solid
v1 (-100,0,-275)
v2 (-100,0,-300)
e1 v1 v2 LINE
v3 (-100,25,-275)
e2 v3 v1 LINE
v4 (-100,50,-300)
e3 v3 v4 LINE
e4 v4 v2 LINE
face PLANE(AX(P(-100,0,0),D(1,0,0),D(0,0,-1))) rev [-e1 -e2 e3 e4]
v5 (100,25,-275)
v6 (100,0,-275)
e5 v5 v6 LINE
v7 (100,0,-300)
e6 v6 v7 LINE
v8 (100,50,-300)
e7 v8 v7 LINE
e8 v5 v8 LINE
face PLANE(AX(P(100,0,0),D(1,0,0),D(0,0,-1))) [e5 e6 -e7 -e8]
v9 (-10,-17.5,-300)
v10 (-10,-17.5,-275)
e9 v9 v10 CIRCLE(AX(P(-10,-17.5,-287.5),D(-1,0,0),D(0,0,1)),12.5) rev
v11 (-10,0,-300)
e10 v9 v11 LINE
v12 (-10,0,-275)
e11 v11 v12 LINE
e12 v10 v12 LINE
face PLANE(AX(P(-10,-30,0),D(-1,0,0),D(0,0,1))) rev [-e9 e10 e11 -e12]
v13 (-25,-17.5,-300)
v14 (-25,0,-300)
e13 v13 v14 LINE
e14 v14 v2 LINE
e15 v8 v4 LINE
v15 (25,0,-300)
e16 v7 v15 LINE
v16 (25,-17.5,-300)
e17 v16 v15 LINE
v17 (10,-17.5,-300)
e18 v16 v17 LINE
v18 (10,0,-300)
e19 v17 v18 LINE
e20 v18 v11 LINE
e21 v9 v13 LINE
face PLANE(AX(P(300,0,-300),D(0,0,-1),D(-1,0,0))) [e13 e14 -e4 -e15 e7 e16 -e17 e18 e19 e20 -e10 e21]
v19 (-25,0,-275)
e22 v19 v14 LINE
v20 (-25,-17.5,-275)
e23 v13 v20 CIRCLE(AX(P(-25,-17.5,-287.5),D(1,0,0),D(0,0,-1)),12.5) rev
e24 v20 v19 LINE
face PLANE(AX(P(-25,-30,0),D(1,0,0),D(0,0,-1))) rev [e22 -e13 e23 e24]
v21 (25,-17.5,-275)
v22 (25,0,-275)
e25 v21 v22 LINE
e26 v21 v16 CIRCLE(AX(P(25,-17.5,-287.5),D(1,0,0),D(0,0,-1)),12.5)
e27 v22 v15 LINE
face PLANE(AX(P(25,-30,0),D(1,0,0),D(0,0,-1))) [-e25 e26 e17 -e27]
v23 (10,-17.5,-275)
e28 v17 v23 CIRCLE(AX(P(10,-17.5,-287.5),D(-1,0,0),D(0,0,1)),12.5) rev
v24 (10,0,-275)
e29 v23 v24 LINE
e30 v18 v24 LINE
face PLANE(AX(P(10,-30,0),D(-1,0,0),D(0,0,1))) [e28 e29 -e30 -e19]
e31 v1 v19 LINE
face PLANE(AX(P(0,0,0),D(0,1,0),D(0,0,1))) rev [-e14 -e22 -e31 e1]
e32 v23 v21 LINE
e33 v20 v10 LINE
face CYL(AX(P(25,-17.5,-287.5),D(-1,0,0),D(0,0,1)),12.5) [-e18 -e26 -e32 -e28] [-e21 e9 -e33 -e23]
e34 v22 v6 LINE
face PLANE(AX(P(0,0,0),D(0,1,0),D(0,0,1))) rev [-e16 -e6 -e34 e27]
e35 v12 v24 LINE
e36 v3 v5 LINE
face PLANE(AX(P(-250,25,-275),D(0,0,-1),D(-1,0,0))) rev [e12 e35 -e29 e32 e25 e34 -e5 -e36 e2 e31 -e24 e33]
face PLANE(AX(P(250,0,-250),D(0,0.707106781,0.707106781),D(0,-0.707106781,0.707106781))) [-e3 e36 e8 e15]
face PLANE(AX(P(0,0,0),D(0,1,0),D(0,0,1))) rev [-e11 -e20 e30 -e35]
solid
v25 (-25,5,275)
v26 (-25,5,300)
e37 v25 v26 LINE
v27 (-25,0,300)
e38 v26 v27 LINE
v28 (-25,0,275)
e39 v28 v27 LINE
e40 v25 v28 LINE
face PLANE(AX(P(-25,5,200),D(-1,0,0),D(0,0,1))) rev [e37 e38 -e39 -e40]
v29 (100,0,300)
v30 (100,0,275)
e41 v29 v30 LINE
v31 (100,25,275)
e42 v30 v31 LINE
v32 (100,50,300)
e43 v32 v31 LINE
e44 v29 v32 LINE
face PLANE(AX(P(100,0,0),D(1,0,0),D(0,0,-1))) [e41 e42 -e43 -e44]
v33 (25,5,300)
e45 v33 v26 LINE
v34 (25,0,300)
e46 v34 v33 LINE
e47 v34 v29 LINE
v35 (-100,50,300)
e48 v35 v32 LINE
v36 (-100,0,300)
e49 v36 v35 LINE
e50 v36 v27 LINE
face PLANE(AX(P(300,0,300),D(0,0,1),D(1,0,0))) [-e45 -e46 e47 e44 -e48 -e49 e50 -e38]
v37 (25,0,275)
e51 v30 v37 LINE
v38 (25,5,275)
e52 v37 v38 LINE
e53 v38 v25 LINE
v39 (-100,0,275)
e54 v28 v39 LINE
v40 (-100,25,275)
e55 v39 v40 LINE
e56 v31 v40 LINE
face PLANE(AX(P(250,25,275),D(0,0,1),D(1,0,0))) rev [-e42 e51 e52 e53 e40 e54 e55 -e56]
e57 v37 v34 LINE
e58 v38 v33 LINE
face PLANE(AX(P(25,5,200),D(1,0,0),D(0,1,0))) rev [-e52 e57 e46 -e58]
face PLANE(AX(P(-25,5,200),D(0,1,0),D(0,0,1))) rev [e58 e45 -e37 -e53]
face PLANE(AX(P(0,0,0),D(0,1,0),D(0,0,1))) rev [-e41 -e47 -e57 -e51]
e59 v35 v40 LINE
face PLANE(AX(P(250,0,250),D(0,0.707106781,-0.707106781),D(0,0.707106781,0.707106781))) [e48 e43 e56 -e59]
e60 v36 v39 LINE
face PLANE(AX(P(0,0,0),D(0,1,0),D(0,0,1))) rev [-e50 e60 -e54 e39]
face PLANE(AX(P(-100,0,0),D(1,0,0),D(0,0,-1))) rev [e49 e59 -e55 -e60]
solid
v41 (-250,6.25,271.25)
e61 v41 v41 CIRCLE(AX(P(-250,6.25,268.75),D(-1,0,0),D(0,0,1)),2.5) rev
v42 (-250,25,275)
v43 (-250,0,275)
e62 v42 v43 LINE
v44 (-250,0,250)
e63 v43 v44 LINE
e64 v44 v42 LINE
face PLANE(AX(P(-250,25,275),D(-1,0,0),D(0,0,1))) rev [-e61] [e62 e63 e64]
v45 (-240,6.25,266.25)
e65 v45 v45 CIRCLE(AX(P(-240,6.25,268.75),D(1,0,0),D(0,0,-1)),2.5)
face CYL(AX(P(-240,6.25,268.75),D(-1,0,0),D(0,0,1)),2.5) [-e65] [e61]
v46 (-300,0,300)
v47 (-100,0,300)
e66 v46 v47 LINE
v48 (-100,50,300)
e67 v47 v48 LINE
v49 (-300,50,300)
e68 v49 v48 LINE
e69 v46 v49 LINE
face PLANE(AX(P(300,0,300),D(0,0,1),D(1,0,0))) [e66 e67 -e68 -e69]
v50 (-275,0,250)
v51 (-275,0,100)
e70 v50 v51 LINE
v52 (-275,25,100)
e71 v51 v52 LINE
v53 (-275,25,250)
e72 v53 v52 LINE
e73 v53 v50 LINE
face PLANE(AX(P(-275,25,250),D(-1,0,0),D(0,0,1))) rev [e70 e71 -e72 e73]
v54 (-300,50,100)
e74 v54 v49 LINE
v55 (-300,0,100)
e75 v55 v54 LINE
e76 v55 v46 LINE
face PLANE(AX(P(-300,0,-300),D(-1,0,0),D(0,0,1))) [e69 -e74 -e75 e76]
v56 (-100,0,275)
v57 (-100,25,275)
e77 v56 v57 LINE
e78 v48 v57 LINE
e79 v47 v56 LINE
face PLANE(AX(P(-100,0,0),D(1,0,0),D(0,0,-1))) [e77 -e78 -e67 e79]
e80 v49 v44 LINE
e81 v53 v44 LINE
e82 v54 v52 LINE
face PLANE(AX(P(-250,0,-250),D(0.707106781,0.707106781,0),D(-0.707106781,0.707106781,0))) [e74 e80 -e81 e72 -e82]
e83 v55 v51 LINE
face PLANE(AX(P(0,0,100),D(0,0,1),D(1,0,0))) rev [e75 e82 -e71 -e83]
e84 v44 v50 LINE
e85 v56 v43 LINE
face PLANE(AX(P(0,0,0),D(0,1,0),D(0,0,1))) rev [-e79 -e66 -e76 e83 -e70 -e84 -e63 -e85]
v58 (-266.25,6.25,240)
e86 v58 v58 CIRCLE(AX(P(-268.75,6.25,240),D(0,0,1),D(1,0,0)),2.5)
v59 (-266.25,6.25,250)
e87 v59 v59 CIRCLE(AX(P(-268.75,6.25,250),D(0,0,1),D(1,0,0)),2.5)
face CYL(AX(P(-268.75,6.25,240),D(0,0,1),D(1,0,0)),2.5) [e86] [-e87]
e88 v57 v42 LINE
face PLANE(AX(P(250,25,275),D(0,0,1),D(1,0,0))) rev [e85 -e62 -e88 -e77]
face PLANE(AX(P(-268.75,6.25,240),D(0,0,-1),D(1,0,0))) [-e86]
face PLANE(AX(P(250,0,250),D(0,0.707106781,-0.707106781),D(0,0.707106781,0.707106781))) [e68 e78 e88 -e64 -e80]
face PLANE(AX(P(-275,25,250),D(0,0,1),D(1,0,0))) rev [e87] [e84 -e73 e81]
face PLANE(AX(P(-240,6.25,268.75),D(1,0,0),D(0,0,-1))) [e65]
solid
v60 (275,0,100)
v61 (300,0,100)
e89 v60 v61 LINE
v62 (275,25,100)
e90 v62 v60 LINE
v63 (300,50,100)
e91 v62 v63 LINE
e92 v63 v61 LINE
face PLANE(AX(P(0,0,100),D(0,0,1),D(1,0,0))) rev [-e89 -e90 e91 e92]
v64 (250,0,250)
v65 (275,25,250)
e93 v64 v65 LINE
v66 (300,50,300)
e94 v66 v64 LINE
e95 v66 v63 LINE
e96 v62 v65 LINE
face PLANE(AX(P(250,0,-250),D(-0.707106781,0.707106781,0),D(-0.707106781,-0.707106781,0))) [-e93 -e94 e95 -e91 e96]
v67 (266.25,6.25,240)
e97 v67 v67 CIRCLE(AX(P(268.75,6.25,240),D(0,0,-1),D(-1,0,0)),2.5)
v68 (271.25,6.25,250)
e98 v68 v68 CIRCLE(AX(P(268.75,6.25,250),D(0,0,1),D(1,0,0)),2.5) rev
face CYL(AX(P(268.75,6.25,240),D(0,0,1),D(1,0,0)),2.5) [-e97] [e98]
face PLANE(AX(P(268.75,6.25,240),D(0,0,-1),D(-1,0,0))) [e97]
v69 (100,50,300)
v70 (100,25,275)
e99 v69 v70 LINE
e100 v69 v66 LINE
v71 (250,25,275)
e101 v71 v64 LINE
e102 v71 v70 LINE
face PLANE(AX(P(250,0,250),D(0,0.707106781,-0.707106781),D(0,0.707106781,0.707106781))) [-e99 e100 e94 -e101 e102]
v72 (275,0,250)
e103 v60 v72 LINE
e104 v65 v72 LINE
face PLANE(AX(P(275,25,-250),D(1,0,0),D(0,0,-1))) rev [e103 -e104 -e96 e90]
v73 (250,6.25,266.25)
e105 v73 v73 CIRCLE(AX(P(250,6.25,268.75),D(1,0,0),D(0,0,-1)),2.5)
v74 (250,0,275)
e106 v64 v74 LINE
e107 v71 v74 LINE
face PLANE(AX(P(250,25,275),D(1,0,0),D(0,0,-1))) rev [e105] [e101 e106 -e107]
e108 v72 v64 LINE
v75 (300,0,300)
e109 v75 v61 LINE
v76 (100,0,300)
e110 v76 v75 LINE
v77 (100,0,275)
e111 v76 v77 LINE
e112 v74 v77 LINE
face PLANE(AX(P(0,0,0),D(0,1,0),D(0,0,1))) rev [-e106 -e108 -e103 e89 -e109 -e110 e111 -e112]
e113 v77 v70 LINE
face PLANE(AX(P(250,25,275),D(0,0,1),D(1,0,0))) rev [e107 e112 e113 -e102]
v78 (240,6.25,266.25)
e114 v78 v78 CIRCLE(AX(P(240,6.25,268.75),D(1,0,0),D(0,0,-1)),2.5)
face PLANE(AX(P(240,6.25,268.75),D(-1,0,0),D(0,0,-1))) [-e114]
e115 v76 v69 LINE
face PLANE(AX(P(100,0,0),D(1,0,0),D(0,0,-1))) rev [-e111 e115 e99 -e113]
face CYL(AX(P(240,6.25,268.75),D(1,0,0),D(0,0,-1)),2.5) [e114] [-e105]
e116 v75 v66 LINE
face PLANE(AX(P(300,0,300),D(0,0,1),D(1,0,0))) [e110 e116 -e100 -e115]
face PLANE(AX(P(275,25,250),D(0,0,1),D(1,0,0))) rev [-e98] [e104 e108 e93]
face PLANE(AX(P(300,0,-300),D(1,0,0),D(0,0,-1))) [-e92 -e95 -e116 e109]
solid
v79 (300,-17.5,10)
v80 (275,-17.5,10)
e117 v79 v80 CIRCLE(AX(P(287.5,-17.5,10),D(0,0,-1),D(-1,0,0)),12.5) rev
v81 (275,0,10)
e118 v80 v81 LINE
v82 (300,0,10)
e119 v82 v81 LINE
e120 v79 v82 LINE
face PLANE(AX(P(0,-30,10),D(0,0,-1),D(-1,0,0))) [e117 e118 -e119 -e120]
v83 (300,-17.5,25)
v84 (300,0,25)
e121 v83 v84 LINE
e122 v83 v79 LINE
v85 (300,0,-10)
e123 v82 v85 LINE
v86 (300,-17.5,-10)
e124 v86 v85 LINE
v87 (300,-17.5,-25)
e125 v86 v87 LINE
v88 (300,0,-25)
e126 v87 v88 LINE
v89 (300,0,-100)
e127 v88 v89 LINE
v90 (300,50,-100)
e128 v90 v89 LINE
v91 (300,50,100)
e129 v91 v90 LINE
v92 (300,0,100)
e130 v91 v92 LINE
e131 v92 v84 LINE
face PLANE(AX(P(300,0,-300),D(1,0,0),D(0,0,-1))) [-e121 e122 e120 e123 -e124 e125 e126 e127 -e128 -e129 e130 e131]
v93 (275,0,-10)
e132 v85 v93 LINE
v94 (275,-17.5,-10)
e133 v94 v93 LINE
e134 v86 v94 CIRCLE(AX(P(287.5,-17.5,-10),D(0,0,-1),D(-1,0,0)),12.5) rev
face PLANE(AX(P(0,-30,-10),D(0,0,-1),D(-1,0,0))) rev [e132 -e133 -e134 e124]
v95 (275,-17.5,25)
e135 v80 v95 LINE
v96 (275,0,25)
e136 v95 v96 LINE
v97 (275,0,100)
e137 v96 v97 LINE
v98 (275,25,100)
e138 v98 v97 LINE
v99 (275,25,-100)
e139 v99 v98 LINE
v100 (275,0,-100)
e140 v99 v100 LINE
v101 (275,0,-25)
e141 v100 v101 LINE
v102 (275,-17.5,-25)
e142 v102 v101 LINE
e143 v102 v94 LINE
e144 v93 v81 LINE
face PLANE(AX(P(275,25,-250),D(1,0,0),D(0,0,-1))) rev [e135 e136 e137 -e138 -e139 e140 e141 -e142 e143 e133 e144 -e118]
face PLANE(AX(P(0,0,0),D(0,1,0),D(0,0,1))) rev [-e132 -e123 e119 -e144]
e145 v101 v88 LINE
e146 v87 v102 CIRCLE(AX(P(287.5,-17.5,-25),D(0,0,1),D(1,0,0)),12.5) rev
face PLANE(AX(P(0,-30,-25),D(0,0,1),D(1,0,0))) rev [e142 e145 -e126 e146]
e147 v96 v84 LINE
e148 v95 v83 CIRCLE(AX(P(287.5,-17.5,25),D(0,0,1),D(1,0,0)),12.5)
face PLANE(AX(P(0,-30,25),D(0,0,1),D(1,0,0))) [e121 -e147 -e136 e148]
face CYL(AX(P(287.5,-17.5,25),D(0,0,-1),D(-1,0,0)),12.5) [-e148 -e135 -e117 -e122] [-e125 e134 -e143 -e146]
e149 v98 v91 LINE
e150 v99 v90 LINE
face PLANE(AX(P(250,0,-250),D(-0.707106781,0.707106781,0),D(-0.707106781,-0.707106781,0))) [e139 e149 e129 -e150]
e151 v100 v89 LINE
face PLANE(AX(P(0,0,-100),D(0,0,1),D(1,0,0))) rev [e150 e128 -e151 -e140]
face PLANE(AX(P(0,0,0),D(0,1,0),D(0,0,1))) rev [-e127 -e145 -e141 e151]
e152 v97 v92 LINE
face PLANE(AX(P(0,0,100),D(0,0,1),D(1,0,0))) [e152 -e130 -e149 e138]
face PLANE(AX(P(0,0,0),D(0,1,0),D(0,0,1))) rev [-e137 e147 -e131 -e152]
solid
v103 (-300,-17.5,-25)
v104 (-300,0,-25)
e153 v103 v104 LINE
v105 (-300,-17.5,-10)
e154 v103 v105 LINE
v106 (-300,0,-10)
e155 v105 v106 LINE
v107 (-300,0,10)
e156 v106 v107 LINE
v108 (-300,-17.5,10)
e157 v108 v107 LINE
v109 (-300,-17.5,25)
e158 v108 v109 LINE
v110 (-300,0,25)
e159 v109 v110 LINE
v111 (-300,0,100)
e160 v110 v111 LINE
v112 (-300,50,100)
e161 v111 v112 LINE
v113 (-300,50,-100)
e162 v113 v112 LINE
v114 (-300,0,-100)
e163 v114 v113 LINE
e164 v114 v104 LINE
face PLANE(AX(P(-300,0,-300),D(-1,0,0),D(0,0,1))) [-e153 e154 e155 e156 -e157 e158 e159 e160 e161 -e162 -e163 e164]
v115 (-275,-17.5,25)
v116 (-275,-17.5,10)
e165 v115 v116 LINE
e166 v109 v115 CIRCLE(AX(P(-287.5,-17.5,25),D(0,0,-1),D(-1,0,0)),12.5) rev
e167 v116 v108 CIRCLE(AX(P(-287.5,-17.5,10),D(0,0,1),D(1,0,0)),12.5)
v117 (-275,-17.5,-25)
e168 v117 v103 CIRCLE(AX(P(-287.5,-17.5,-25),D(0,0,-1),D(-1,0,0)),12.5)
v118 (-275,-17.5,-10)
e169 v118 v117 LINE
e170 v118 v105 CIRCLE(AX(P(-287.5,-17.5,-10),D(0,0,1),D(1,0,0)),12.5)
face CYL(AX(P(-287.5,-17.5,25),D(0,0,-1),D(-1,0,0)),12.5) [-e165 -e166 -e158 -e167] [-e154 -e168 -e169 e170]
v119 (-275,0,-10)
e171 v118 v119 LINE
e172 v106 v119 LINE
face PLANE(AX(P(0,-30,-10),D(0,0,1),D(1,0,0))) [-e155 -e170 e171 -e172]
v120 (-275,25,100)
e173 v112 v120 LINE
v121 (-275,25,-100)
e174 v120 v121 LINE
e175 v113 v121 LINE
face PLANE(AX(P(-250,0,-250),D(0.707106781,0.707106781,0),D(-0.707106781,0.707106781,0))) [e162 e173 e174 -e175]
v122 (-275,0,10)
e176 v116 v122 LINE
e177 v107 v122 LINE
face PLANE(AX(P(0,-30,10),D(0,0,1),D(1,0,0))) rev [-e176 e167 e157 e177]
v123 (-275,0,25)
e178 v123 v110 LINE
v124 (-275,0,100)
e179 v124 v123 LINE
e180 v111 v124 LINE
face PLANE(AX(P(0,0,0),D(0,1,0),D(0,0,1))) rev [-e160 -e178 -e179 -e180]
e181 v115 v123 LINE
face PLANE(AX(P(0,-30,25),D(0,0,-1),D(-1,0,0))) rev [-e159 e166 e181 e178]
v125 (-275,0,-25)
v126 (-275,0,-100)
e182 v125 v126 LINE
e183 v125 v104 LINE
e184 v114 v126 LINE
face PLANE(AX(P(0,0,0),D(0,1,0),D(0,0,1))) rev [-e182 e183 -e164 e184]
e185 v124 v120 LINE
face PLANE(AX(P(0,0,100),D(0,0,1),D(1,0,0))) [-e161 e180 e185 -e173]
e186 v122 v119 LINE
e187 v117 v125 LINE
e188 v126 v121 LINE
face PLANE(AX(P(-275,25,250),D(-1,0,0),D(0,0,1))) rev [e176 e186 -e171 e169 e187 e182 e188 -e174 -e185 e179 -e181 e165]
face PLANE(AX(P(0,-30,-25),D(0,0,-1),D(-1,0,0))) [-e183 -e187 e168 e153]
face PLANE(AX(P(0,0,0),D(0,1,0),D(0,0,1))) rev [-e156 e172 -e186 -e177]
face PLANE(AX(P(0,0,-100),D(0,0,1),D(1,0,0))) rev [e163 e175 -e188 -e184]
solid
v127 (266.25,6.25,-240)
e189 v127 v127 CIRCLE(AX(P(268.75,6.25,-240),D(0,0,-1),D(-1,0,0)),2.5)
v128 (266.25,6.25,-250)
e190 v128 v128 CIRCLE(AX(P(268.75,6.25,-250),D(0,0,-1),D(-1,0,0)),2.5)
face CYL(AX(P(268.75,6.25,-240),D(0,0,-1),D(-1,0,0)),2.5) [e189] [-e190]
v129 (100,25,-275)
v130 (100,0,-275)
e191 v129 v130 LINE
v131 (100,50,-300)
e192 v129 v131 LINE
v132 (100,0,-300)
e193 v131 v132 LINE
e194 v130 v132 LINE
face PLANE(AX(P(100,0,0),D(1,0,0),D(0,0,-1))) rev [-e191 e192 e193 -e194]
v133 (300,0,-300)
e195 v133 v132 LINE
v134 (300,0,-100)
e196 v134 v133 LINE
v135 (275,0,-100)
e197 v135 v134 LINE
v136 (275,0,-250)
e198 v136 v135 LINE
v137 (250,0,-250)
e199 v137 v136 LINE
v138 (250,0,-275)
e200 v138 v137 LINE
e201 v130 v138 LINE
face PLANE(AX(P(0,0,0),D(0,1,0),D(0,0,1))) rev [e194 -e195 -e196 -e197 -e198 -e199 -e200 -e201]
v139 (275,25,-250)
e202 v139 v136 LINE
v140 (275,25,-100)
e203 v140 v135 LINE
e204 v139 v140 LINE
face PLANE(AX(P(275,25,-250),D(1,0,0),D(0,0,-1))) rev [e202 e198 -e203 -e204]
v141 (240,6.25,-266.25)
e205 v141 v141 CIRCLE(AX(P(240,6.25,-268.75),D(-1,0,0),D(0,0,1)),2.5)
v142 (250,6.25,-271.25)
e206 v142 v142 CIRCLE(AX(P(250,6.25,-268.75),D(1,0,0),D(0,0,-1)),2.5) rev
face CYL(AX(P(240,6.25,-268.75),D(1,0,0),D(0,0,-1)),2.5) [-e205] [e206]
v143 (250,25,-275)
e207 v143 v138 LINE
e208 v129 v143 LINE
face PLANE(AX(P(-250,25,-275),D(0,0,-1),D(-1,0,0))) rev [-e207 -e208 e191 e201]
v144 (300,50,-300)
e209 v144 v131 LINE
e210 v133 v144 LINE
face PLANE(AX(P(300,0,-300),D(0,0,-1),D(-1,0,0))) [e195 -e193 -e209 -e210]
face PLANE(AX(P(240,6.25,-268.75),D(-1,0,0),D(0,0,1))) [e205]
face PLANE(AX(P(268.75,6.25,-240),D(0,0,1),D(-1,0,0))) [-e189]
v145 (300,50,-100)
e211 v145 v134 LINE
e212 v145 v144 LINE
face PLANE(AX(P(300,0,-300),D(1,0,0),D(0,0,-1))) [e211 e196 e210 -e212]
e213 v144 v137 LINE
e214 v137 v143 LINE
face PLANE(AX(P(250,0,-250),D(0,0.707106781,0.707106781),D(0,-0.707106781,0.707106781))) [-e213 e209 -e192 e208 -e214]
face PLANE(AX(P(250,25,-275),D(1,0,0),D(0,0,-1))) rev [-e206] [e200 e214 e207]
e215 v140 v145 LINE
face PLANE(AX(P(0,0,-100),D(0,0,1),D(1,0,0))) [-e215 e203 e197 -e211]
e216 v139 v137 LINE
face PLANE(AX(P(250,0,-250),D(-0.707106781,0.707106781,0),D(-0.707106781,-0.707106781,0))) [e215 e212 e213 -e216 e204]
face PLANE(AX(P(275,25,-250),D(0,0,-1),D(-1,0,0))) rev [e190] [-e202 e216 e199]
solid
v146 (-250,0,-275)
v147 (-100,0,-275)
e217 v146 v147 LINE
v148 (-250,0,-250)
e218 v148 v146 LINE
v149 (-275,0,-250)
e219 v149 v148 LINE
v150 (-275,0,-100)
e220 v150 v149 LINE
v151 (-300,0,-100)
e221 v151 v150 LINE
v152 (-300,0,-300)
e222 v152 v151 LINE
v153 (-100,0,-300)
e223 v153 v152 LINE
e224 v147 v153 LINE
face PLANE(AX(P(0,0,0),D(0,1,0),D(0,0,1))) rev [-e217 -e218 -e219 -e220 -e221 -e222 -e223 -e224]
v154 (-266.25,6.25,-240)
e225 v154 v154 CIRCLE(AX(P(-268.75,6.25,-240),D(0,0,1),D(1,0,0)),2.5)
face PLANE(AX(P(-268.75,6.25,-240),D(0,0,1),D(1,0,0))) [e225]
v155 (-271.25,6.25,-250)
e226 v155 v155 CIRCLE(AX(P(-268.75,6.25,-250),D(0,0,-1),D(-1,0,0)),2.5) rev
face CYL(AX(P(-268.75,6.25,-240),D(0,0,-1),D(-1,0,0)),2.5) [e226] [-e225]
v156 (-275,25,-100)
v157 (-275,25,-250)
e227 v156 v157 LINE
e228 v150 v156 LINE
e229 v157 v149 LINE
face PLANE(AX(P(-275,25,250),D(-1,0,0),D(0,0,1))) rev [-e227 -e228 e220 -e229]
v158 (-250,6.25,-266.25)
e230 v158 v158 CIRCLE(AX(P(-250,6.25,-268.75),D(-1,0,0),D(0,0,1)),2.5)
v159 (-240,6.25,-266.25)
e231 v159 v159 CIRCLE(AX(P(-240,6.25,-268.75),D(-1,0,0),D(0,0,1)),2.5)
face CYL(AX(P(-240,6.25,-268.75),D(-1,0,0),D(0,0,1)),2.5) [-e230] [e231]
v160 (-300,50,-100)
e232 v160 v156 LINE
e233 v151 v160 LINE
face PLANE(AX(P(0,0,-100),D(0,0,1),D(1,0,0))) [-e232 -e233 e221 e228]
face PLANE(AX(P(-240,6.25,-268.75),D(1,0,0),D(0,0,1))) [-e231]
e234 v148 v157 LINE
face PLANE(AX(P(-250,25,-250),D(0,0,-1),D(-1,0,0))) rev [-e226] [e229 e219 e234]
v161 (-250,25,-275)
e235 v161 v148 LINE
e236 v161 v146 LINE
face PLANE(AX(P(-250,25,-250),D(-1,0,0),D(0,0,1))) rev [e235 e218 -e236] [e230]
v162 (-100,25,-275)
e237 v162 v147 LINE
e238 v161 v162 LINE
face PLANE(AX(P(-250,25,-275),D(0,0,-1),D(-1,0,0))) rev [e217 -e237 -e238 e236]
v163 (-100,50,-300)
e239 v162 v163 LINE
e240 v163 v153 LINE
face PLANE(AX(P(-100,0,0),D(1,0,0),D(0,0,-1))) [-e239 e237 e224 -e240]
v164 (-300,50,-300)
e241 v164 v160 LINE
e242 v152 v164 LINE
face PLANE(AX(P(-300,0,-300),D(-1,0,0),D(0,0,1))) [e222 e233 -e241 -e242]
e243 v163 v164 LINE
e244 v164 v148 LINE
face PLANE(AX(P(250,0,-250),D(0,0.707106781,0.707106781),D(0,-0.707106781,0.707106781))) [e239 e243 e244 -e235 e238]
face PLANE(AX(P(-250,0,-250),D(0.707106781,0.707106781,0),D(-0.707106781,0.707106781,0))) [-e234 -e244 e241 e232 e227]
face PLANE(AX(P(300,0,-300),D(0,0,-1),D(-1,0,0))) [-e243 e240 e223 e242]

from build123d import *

# Parameters (mm, degrees)
SKETCH1_W                                  = 700
SKETCH1_H                                  = 700
SKETCH1_W_2                                = 500
SKETCH1_H_2                                = 500
BOSS_EXTRUDE2_DEPTH                        = 50
BOSS_EXTRUDE2_DRAFT                        = 45
SKETCH6_W                                  = 700
SKETCH6_H                                  = 700
SKETCH6_W_2                                = 600
SKETCH6_H_2                                = 600
CUT_EXTRUDE1_DEPTH                         = 50
CUT_EXTRUDE2_DEPTH                         = 25
SKETCH8_R                                  = 2.5
BOSS_EXTRUDE3_DEPTH                        = 10
MIRROR1_AT_THE_SECOND_PLANE_COPY_1_SKETC_R = 2.5
MIRROR1_AT_THE_SECOND_PLANE_COPY_1_DEPTH   = 10
MIRROR2_COPY_1_SKETCH_R                    = 2.5
MIRROR2_COPY_1_DEPTH                       = 10
MIRROR2_COPY_2_SKETCH_R                    = 2.5
MIRROR2_COPY_2_DEPTH                       = 10
MIRROR2_COPY_3_SKETCH_R                    = 2.5
MIRROR2_COPY_3_DEPTH                       = 10
SKETCH9_W                                  = 25
SKETCH9_H                                  = 15
BOSS_EXTRUDE4_DEPTH                        = 30
SKETCH11_R                                 = 12.5
BOSS_EXTRUDE5_DEPTH                        = 50
FILLET1_R                                  = 12.5
FILLET1_OF_MIRROR3_R                       = 12.5
MIRROR4_START                              = -25
MIRROR4_OUTLINE_R                          = 12.5
MIRROR4_DEPTH                              = 50
MIRROR4_2_DEPTH                            = 15
MIRROR4_START_2                            = 10
MIRROR4_3_DEPTH                            = 15
INTERSECT1_START                           = -300
INTERSECT1_DEPTH                           = 200
INTERSECT1_2_DEPTH                         = 50
INTERSECT1_START_2                         = -250
INTERSECT1_3_OUTLINE_R                     = 2.5
INTERSECT1_3_DEPTH                         = 10
INTERSECT1_4_DEPTH                         = 200
INTERSECT1_START_3                         = -279.452
INTERSECT1_5_DEPTH                         = 29.452
INTERSECT1_6_OUTLINE_R                     = 2.5
INTERSECT1_6_DEPTH                         = 10
INTERSECT1_7_DEPTH                         = 600
INTERSECT1_8_DEPTH                         = 200
INTERSECT1_START_4                         = 100
INTERSECT1_9_DEPTH                         = 200
INTERSECT1_START_5                         = -100
INTERSECT1_10_DEPTH                        = 200
INTERSECT1_START_6                         = -25
INTERSECT1_11_OUTLINE_R                    = 12.5
INTERSECT1_11_DEPTH                        = 50
INTERSECT1_12_DEPTH                        = 15
INTERSECT1_START_7                         = 10
INTERSECT1_13_DEPTH                        = 15
INTERSECT1_14_DEPTH                        = 200
INTERSECT1_START_8                         = 250
INTERSECT1_15_DEPTH                        = 50
INTERSECT1_START_9                         = 240
INTERSECT1_16_OUTLINE_R                    = 2.5
INTERSECT1_16_DEPTH                        = 10
INTERSECT1_17_DEPTH                        = 200
INTERSECT1_START_10                        = -280.548
INTERSECT1_18_DEPTH                        = 30.548
INTERSECT1_19_OUTLINE_R                    = 2.5
INTERSECT1_19_DEPTH                        = 10
INTERSECT1_20_DEPTH                        = 200
INTERSECT1_21_OUTLINE_R                    = 12.5
INTERSECT1_21_DEPTH                        = 50
INTERSECT1_22_DEPTH                        = 15
INTERSECT1_23_DEPTH                        = 15
INTERSECT1_24_DEPTH                        = 200
INTERSECT1_25_OUTLINE_R                    = 12.5
INTERSECT1_25_DEPTH                        = 50
INTERSECT1_26_DEPTH                        = 15
INTERSECT1_27_DEPTH                        = 15
INTERSECT1_28_DEPTH                        = 200
INTERSECT1_29_DEPTH                        = 50
INTERSECT1_30_OUTLINE_R                    = 2.5
INTERSECT1_30_DEPTH                        = 10
INTERSECT1_31_DEPTH                        = 200
INTERSECT1_32_DEPTH                        = 30.548
INTERSECT1_33_OUTLINE_R                    = 2.5
INTERSECT1_33_DEPTH                        = 10
INTERSECT1_34_DEPTH                        = 200
INTERSECT1_35_DEPTH                        = 50
INTERSECT1_36_OUTLINE_R                    = 2.5
INTERSECT1_36_DEPTH                        = 10
INTERSECT1_37_DEPTH                        = 200
INTERSECT1_38_DEPTH                        = 30.548
INTERSECT1_39_OUTLINE_R                    = 2.5
INTERSECT1_39_DEPTH                        = 10
SKETCH20_W                                 = 50
SKETCH20_H                                 = 35
CUT_EXTRUDE3_DEPTH                         = 100


with BuildPart() as part:
    # Sketch1 → Boss-Extrude2 (with draft: the straight prism first)
    with BuildSketch(Plane(origin=(0, 0, 0), x_dir=(1, 0, 0), z_dir=(0, 1, 0))):
        Rectangle(SKETCH1_W, SKETCH1_H)
        Rectangle(SKETCH1_W_2, SKETCH1_H_2, mode=Mode.SUBTRACT)
    extrude(amount=BOSS_EXTRUDE2_DEPTH)
    # Boss-Extrude2: the draft: its side faces are tilted about the plane it starts from
    boss_extrude2_sides = [part.faces().sort_by_distance(p)[0] for p in [
        (-350, 25, 0),
        (0, 25, 350),
        (350, 25, 0),
        (0, 25, -350),
        (250, 25, 0),
        (0, 25, 250),
        (-250, 25, 0),
        (0, 25, -250),
    ]]
    draft(boss_extrude2_sides, Plane(origin=(0, 0, 0), x_dir=(1, 0, 0), z_dir=(0, 1, 0)), BOSS_EXTRUDE2_DRAFT)

    # Sketch6 → Cut-Extrude1 (cut)
    with BuildSketch(Plane(origin=(0, 50, 0), x_dir=(1, 0, 0), z_dir=(0, 1, 0))):
        Rectangle(SKETCH6_W, SKETCH6_H)
        Rectangle(SKETCH6_W_2, SKETCH6_H_2, mode=Mode.SUBTRACT)
    extrude(amount=-CUT_EXTRUDE1_DEPTH, mode=Mode.SUBTRACT)

    # Sketch7 → Cut-Extrude2 (cut)
    with BuildSketch(Plane.XZ):
        Polygon((-275, 250), (-250, 250), (-250, 275), (250, 275), (250, 250), (275, 250), (275, -250), (250, -250), (250, -275), (-250, -275), (-250, -250), (-275, -250), align=None)
    extrude(amount=-CUT_EXTRUDE2_DEPTH, mode=Mode.SUBTRACT)

    # Sketch8 → Boss-Extrude3 (add)
    with BuildSketch(Plane.XY.offset(-250)):
        with Locations(Location((-268.75, 6.25, 0), (0, 0, 180))):
            Circle(SKETCH8_R)
    boss_extrude3 = extrude(amount=BOSS_EXTRUDE3_DEPTH)

    # Mirror1: Boss-Extrude3 across plane
    add(boss_extrude3.mirror(Plane(origin=(0, 0, 0), x_dir=(0, 0, 1), z_dir=(1, 0, 0))))

    # Mirror1 at the second plane: Boss-Extrude3 across plane
    add(boss_extrude3.mirror(Plane.XY))

    # Mirror1 at the second plane copy 1 sketc → Mirror1 at the second plane copy 1 (add)
    with BuildSketch(Plane(origin=(0, 0, 250), x_dir=(-1, 0, 0), z_dir=(0, 0, -1))):
        with Locations(Location((-268.75, 6.25, 0), (0, 0, 180))):
            Circle(MIRROR1_AT_THE_SECOND_PLANE_COPY_1_SKETC_R)
    extrude(amount=MIRROR1_AT_THE_SECOND_PLANE_COPY_1_DEPTH)

    # Mirror2: Boss-Extrude3 across plane
    add(boss_extrude3.mirror(Plane(origin=(0, 0, 0), x_dir=(0.7071067811865477, 0, 0.7071067811865474), z_dir=(-0.7071067811865474, 0, 0.7071067811865477))))

    # Mirror2 copy 1 sketch → Mirror2 copy 1 (add)
    with BuildSketch(Plane(origin=(-250, 0, 0), x_dir=(0, 0, -1), z_dir=(1, 0, 0))):
        with Locations(Location((-268.75, 6.25, 0), (0, 0, 180))):
            Circle(MIRROR2_COPY_1_SKETCH_R)
    extrude(amount=MIRROR2_COPY_1_DEPTH)

    # Mirror2 copy 2 sketch → Mirror2 copy 2 (add)
    with BuildSketch(Plane.ZY.offset(-250)):
        with Locations(Location((-268.75, 6.25, 0), (0, 0, 180))):
            Circle(MIRROR2_COPY_2_SKETCH_R)
    extrude(amount=MIRROR2_COPY_2_DEPTH)

    # Mirror2 copy 3 sketch → Mirror2 copy 3 (add)
    with BuildSketch(Plane(origin=(250, 0, 0), x_dir=(0, 0, -1), z_dir=(-1, 0, 0))):
        with Locations((-268.75, -6.25)):
            Circle(MIRROR2_COPY_3_SKETCH_R)
    extrude(amount=MIRROR2_COPY_3_DEPTH)

    # Sketch9 → Boss-Extrude4 (add)
    with BuildSketch(Plane.XZ):
        with Locations((-287.5, 17.5)):
            Rectangle(SKETCH9_W, SKETCH9_H)
        with Locations((-287.5, -17.5)):
            Rectangle(SKETCH9_W, SKETCH9_H)
    boss_extrude4 = extrude(amount=BOSS_EXTRUDE4_DEPTH)

    # Sketch11 → Boss-Extrude5 (add)
    with BuildSketch(Plane(origin=(0, 0, -25), x_dir=(-1, 0, 0), z_dir=(0, 0, -1))):
        with Locations((287.5, -17.5)):
            Circle(SKETCH11_R)
    boss_extrude5 = extrude(amount=-BOSS_EXTRUDE5_DEPTH)

    # Fillet1
    fillet1_edges = [part.edges().sort_by_distance(p)[0] for p in [
        (-275, -30, -17.5),
        (-275, -30, 17.5),
        (-300, -30, 17.5),
        (-300, -30, -17.5),
    ]]
    fillet(fillet1_edges, radius=FILLET1_R - 0.0001)  # a hair under: the kernel refuses the full size

    # Mirror3: Boss-Extrude4, Boss-Extrude5 across plane
    add(boss_extrude4.mirror(Plane(origin=(0, 0, 0), x_dir=(0, 0, 1), z_dir=(1, 0, 0))))
    add(boss_extrude5.mirror(Plane(origin=(0, 0, 0), x_dir=(0, 0, 1), z_dir=(1, 0, 0))))

    # Fillet1 of Mirror3
    fillet1_of_mirror3_edges = [part.edges().sort_by_distance(p)[0] for p in [
        (275, -30, -17.5),
        (275, -30, 17.5),
        (300, -30, 17.5),
        (300, -30, -17.5),
    ]]
    fillet(fillet1_of_mirror3_edges, radius=FILLET1_OF_MIRROR3_R - 0.0001)  # a hair under: the kernel refuses the full size



with BuildPart() as body_2:
    # Mirror4: read off the stored shape, not the designer's step
    # Mirror4 outline → Mirror4 (new body)
    with BuildSketch(Plane.YZ.offset(MIRROR4_START)):
        with Locations((-17.5, 287.5)):
            Circle(MIRROR4_OUTLINE_R)
        with Locations((-17.5, -287.5)):
            Circle(MIRROR4_OUTLINE_R)
    extrude(amount=MIRROR4_DEPTH)


with BuildPart() as part_1:
    add(part.part)

    add(body_2.part)  # Mirror4 2 merges body 2
    # Mirror4 2 outline → Mirror4 2 (add)
    with BuildSketch(Plane.YZ.offset(MIRROR4_START)):
        with BuildLine():
            ThreePointArc((-17.5, 300), (-5, 287.5), (-17.5, 275))
            Line((-17.5, 275), (0, 275))
            Line((0, 275), (0, 300))
            Line((0, 300), (-17.5, 300))
        make_face()
        with BuildLine():
            ThreePointArc((-17.5, -275), (-5, -287.5), (-17.5, -300))
            Line((-17.5, -300), (0, -300))
            Line((0, -300), (0, -275))
            Line((0, -275), (-17.5, -275))
        make_face()
    extrude(amount=MIRROR4_2_DEPTH)

    # Mirror4 3 outline → Mirror4 3 (add)
    with BuildSketch(Plane.YZ.offset(MIRROR4_START_2)):
        with BuildLine():
            ThreePointArc((-17.5, 300), (-5, 287.5), (-17.5, 275))
            Line((-17.5, 275), (0, 275))
            Line((0, 275), (0, 300))
            Line((0, 300), (-17.5, 300))
        make_face()
        with BuildLine():
            ThreePointArc((-17.5, -275), (-5, -287.5), (-17.5, -300))
            Line((-17.5, -300), (0, -300))
            Line((0, -300), (0, -275))
            Line((0, -275), (-17.5, -275))
        make_face()
    extrude(amount=MIRROR4_3_DEPTH)

    # Intersect1 7 outline → Intersect1 7 (cut)
    with BuildSketch(Plane.XY.offset(INTERSECT1_START)):
        Polygon((302, 52), (-302, 52), (-302, 0), (-300, 0), (-300, 50), (-275, 25), (-275, -32), (302, -32), align=None)
    extrude(amount=INTERSECT1_7_DEPTH, mode=Mode.SUBTRACT)

    # Intersect1 8 outline → Intersect1 8 (cut)
    with BuildSketch(Plane.XY.offset(INTERSECT1_START)):
        Polygon((-300, 0), (-275, 0), (-275, 25), (-300, 50), align=None)
    extrude(amount=INTERSECT1_8_DEPTH, mode=Mode.SUBTRACT)

    # Intersect1 9 outline → Intersect1 9 (cut)
    with BuildSketch(Plane.XY.offset(INTERSECT1_START_4)):
        Polygon((-300, 0), (-275, 0), (-275, 25), (-300, 50), align=None)
    extrude(amount=INTERSECT1_9_DEPTH, mode=Mode.SUBTRACT)


with BuildPart() as body_2_2:
    # Intersect1: read off the stored shape, not the designer's step
    # Intersect1 outline → Intersect1 (new body)
    with BuildSketch(Plane.YZ.offset(INTERSECT1_START)):
        Polygon((0, -275), (0, -300), (50, -300), (25, -275), align=None)
    extrude(amount=INTERSECT1_DEPTH)

    # Intersect1 2 outline → Intersect1 2 (add)
    with BuildSketch(Plane.YZ.offset(INTERSECT1_START)):
        Polygon((0, -250), (0, -275), (25, -275), align=None)
    extrude(amount=INTERSECT1_2_DEPTH)

    # Intersect1 3 outline → Intersect1 3 (add)
    with BuildSketch(Plane.YZ.offset(INTERSECT1_START_2)):
        with Locations((6.25, -268.75)):
            Circle(INTERSECT1_3_OUTLINE_R)
    extrude(amount=INTERSECT1_3_DEPTH)

    # Intersect1 4 outline → Intersect1 4 (add)
    with BuildSketch(Plane.XY.offset(INTERSECT1_START)):
        Polygon((-275, 25), (-300, 50), (-300, 0), (-275, 0), align=None)
    extrude(amount=INTERSECT1_4_DEPTH)

    # Intersect1 5 outline → Intersect1 5 (add)
    with BuildSketch(Plane.XY.offset(INTERSECT1_START_3)):
        Polygon((-250, 0), (-275, 25), (-275, 0), align=None)
    extrude(amount=INTERSECT1_5_DEPTH)

    # Intersect1 6 outline → Intersect1 6 (add)
    with BuildSketch(Plane.XY.offset(INTERSECT1_START_2)):
        with Locations((-268.75, 6.25)):
            Circle(INTERSECT1_6_OUTLINE_R)
    extrude(amount=INTERSECT1_6_DEPTH)


with BuildPart() as body_3:
    # Intersect1 10 outline → Intersect1 10 (new body)
    with BuildSketch(Plane.YZ.offset(INTERSECT1_START_5)):
        Polygon((0, -275), (0, -300), (50, -300), (25, -275), align=None)
    extrude(amount=INTERSECT1_10_DEPTH)

    # Intersect1 11 outline → Intersect1 11 (add)
    with BuildSketch(Plane.YZ.offset(INTERSECT1_START_6)):
        with Locations((-17.5, -287.5)):
            Circle(INTERSECT1_11_OUTLINE_R)
    extrude(amount=INTERSECT1_11_DEPTH)

    # Intersect1 12 outline → Intersect1 12 (add)
    with BuildSketch(Plane.YZ.offset(INTERSECT1_START_6)):
        with BuildLine():
            Line((-17.5, -300), (0, -300))
            Line((0, -300), (0, -275))
            Line((0, -275), (-17.5, -275))
            ThreePointArc((-17.5, -275), (-5, -287.5), (-17.5, -300))
        make_face()
    extrude(amount=INTERSECT1_12_DEPTH)

    # Intersect1 13 outline → Intersect1 13 (add)
    with BuildSketch(Plane.YZ.offset(INTERSECT1_START_7)):
        with BuildLine():
            Line((-17.5, -300), (0, -300))
            Line((0, -300), (0, -275))
            Line((0, -275), (-17.5, -275))
            ThreePointArc((-17.5, -275), (-5, -287.5), (-17.5, -300))
        make_face()
    extrude(amount=INTERSECT1_13_DEPTH)


with BuildPart() as body_4:
    # Intersect1 14 outline → Intersect1 14 (new body)
    with BuildSketch(Plane.YZ.offset(INTERSECT1_START_4)):
        Polygon((0, -275), (0, -300), (50, -300), (25, -275), align=None)
    extrude(amount=INTERSECT1_14_DEPTH)

    # Intersect1 15 outline → Intersect1 15 (add)
    with BuildSketch(Plane.YZ.offset(INTERSECT1_START_8)):
        Polygon((0, -250), (0, -275), (25, -275), align=None)
    extrude(amount=INTERSECT1_15_DEPTH)

    # Intersect1 16 outline → Intersect1 16 (add)
    with BuildSketch(Plane.YZ.offset(INTERSECT1_START_9)):
        with Locations((6.25, -268.75)):
            Circle(INTERSECT1_16_OUTLINE_R)
    extrude(amount=INTERSECT1_16_DEPTH)

    # Intersect1 17 outline → Intersect1 17 (add)
    with BuildSketch(Plane.XY.offset(INTERSECT1_START)):
        Polygon((275, 0), (300, 0), (300, 50), (275, 25), align=None)
    extrude(amount=INTERSECT1_17_DEPTH)

    # Intersect1 18 outline → Intersect1 18 (add)
    with BuildSketch(Plane.XY.offset(INTERSECT1_START_10)):
        Polygon((250, 0), (275, 0), (275, 25), align=None)
    extrude(amount=INTERSECT1_18_DEPTH)

    # Intersect1 19 outline → Intersect1 19 (add)
    with BuildSketch(Plane.XY.offset(INTERSECT1_START_2)):
        with Locations((268.75, 6.25)):
            Circle(INTERSECT1_19_OUTLINE_R)
    extrude(amount=INTERSECT1_19_DEPTH)


with BuildPart() as body_5:
    # Intersect1 20 outline → Intersect1 20 (new body)
    with BuildSketch(Plane.XY.offset(INTERSECT1_START_5)):
        Polygon((275, 0), (300, 0), (300, 50), (275, 25), align=None)
    extrude(amount=INTERSECT1_20_DEPTH)

    # Intersect1 21 outline → Intersect1 21 (add)
    with BuildSketch(Plane.XY.offset(INTERSECT1_START_6)):
        with Locations((287.5, -17.5)):
            Circle(INTERSECT1_21_OUTLINE_R)
    extrude(amount=INTERSECT1_21_DEPTH)

    # Intersect1 22 outline → Intersect1 22 (add)
    with BuildSketch(Plane.XY.offset(INTERSECT1_START_6)):
        with BuildLine():
            ThreePointArc((275, -17.5), (287.5, -5), (300, -17.5))
            Line((300, -17.5), (300, 0))
            Line((300, 0), (275, 0))
            Line((275, 0), (275, -17.5))
        make_face()
    extrude(amount=INTERSECT1_22_DEPTH)

    # Intersect1 23 outline → Intersect1 23 (add)
    with BuildSketch(Plane.XY.offset(INTERSECT1_START_7)):
        with BuildLine():
            ThreePointArc((275, -17.5), (287.5, -5), (300, -17.5))
            Line((300, -17.5), (300, 0))
            Line((300, 0), (275, 0))
            Line((275, 0), (275, -17.5))
        make_face()
    extrude(amount=INTERSECT1_23_DEPTH)


with BuildPart() as body_6:
    # Intersect1 24 outline → Intersect1 24 (new body)
    with BuildSketch(Plane.YZ.offset(INTERSECT1_START_5)):
        Polygon((50, 300), (0, 300), (0, 275), (25, 275), align=None)
    extrude(amount=INTERSECT1_24_DEPTH)

    # Intersect1 25 outline → Intersect1 25 (add)
    with BuildSketch(Plane.YZ.offset(INTERSECT1_START_6)):
        with Locations((-17.5, 287.5)):
            Circle(INTERSECT1_25_OUTLINE_R)
    extrude(amount=INTERSECT1_25_DEPTH)

    # Intersect1 26 outline → Intersect1 26 (add)
    with BuildSketch(Plane.YZ.offset(INTERSECT1_START_6)):
        with BuildLine():
            ThreePointArc((-17.5, 300), (-5, 287.5), (-17.5, 275))
            Line((-17.5, 275), (0, 275))
            Line((0, 275), (0, 300))
            Line((0, 300), (-17.5, 300))
        make_face()
    extrude(amount=INTERSECT1_26_DEPTH)

    # Intersect1 27 outline → Intersect1 27 (add)
    with BuildSketch(Plane.YZ.offset(INTERSECT1_START_7)):
        with BuildLine():
            ThreePointArc((-17.5, 300), (-5, 287.5), (-17.5, 275))
            Line((-17.5, 275), (0, 275))
            Line((0, 275), (0, 300))
            Line((0, 300), (-17.5, 300))
        make_face()
    extrude(amount=INTERSECT1_27_DEPTH)

    # Sketch20 → Cut-Extrude3 (cut)
    with BuildSketch(Plane.XY.offset(300)):
        with Locations((0, -12.5)):
            Rectangle(SKETCH20_W, SKETCH20_H)
    extrude(amount=-CUT_EXTRUDE3_DEPTH, mode=Mode.SUBTRACT)


with BuildPart() as body_7:
    # Intersect1 28 outline → Intersect1 28 (new body)
    with BuildSketch(Plane.YZ.offset(INTERSECT1_START)):
        Polygon((0, 275), (25, 275), (50, 300), (0, 300), align=None)
    extrude(amount=INTERSECT1_28_DEPTH)

    # Intersect1 29 outline → Intersect1 29 (add)
    with BuildSketch(Plane.YZ.offset(INTERSECT1_START)):
        Polygon((0, 275), (0, 250), (25, 275), align=None)
    extrude(amount=INTERSECT1_29_DEPTH)

    # Intersect1 30 outline → Intersect1 30 (add)
    with BuildSketch(Plane.YZ.offset(INTERSECT1_START_2)):
        with Locations((6.25, 268.75)):
            Circle(INTERSECT1_30_OUTLINE_R)
    extrude(amount=INTERSECT1_30_DEPTH)

    # Intersect1 31 outline → Intersect1 31 (add)
    with BuildSketch(Plane.XY.offset(INTERSECT1_START_4)):
        Polygon((-275, 25), (-300, 50), (-300, 0), (-275, 0), align=None)
    extrude(amount=INTERSECT1_31_DEPTH)

    # Intersect1 32 outline → Intersect1 32 (add)
    with BuildSketch(Plane.XY.offset(INTERSECT1_START_8)):
        Polygon((-250, 0), (-275, 25), (-275, 0), align=None)
    extrude(amount=INTERSECT1_32_DEPTH)

    # Intersect1 33 outline → Intersect1 33 (add)
    with BuildSketch(Plane.XY.offset(INTERSECT1_START_9)):
        with Locations((-268.75, 6.25)):
            Circle(INTERSECT1_33_OUTLINE_R)
    extrude(amount=INTERSECT1_33_DEPTH)


with BuildPart() as body_8:
    # Intersect1 34 outline → Intersect1 34 (new body)
    with BuildSketch(Plane.XY.offset(INTERSECT1_START_4)):
        Polygon((275, 0), (300, 0), (300, 50), (275, 25), align=None)
    extrude(amount=INTERSECT1_34_DEPTH)

    # Intersect1 35 outline → Intersect1 35 (add)
    with BuildSketch(Plane.XY.offset(INTERSECT1_START_8)):
        Polygon((250, 0), (275, 0), (275, 25), align=None)
    extrude(amount=INTERSECT1_35_DEPTH)

    # Intersect1 36 outline → Intersect1 36 (add)
    with BuildSketch(Plane.XY.offset(INTERSECT1_START_9)):
        with Locations((268.75, 6.25)):
            Circle(INTERSECT1_36_OUTLINE_R)
    extrude(amount=INTERSECT1_36_DEPTH)

    # Intersect1 37 outline → Intersect1 37 (add)
    with BuildSketch(Plane.YZ.offset(INTERSECT1_START_4)):
        Polygon((0, 275), (25, 275), (50, 300), (0, 300), align=None)
    extrude(amount=INTERSECT1_37_DEPTH)

    # Intersect1 38 outline → Intersect1 38 (add)
    with BuildSketch(Plane.YZ.offset(INTERSECT1_START_8)):
        Polygon((0, 275), (0, 250), (25, 275), align=None)
    extrude(amount=INTERSECT1_38_DEPTH)

    # Intersect1 39 outline → Intersect1 39 (add)
    with BuildSketch(Plane.YZ.offset(INTERSECT1_START_9)):
        with Locations((6.25, 268.75)):
            Circle(INTERSECT1_39_OUTLINE_R)
    extrude(amount=INTERSECT1_39_DEPTH)


solid = Compound([part_1.part, body_2_2.part, body_3.part, body_4.part, body_5.part, body_6.part, body_7.part, body_8.part])
